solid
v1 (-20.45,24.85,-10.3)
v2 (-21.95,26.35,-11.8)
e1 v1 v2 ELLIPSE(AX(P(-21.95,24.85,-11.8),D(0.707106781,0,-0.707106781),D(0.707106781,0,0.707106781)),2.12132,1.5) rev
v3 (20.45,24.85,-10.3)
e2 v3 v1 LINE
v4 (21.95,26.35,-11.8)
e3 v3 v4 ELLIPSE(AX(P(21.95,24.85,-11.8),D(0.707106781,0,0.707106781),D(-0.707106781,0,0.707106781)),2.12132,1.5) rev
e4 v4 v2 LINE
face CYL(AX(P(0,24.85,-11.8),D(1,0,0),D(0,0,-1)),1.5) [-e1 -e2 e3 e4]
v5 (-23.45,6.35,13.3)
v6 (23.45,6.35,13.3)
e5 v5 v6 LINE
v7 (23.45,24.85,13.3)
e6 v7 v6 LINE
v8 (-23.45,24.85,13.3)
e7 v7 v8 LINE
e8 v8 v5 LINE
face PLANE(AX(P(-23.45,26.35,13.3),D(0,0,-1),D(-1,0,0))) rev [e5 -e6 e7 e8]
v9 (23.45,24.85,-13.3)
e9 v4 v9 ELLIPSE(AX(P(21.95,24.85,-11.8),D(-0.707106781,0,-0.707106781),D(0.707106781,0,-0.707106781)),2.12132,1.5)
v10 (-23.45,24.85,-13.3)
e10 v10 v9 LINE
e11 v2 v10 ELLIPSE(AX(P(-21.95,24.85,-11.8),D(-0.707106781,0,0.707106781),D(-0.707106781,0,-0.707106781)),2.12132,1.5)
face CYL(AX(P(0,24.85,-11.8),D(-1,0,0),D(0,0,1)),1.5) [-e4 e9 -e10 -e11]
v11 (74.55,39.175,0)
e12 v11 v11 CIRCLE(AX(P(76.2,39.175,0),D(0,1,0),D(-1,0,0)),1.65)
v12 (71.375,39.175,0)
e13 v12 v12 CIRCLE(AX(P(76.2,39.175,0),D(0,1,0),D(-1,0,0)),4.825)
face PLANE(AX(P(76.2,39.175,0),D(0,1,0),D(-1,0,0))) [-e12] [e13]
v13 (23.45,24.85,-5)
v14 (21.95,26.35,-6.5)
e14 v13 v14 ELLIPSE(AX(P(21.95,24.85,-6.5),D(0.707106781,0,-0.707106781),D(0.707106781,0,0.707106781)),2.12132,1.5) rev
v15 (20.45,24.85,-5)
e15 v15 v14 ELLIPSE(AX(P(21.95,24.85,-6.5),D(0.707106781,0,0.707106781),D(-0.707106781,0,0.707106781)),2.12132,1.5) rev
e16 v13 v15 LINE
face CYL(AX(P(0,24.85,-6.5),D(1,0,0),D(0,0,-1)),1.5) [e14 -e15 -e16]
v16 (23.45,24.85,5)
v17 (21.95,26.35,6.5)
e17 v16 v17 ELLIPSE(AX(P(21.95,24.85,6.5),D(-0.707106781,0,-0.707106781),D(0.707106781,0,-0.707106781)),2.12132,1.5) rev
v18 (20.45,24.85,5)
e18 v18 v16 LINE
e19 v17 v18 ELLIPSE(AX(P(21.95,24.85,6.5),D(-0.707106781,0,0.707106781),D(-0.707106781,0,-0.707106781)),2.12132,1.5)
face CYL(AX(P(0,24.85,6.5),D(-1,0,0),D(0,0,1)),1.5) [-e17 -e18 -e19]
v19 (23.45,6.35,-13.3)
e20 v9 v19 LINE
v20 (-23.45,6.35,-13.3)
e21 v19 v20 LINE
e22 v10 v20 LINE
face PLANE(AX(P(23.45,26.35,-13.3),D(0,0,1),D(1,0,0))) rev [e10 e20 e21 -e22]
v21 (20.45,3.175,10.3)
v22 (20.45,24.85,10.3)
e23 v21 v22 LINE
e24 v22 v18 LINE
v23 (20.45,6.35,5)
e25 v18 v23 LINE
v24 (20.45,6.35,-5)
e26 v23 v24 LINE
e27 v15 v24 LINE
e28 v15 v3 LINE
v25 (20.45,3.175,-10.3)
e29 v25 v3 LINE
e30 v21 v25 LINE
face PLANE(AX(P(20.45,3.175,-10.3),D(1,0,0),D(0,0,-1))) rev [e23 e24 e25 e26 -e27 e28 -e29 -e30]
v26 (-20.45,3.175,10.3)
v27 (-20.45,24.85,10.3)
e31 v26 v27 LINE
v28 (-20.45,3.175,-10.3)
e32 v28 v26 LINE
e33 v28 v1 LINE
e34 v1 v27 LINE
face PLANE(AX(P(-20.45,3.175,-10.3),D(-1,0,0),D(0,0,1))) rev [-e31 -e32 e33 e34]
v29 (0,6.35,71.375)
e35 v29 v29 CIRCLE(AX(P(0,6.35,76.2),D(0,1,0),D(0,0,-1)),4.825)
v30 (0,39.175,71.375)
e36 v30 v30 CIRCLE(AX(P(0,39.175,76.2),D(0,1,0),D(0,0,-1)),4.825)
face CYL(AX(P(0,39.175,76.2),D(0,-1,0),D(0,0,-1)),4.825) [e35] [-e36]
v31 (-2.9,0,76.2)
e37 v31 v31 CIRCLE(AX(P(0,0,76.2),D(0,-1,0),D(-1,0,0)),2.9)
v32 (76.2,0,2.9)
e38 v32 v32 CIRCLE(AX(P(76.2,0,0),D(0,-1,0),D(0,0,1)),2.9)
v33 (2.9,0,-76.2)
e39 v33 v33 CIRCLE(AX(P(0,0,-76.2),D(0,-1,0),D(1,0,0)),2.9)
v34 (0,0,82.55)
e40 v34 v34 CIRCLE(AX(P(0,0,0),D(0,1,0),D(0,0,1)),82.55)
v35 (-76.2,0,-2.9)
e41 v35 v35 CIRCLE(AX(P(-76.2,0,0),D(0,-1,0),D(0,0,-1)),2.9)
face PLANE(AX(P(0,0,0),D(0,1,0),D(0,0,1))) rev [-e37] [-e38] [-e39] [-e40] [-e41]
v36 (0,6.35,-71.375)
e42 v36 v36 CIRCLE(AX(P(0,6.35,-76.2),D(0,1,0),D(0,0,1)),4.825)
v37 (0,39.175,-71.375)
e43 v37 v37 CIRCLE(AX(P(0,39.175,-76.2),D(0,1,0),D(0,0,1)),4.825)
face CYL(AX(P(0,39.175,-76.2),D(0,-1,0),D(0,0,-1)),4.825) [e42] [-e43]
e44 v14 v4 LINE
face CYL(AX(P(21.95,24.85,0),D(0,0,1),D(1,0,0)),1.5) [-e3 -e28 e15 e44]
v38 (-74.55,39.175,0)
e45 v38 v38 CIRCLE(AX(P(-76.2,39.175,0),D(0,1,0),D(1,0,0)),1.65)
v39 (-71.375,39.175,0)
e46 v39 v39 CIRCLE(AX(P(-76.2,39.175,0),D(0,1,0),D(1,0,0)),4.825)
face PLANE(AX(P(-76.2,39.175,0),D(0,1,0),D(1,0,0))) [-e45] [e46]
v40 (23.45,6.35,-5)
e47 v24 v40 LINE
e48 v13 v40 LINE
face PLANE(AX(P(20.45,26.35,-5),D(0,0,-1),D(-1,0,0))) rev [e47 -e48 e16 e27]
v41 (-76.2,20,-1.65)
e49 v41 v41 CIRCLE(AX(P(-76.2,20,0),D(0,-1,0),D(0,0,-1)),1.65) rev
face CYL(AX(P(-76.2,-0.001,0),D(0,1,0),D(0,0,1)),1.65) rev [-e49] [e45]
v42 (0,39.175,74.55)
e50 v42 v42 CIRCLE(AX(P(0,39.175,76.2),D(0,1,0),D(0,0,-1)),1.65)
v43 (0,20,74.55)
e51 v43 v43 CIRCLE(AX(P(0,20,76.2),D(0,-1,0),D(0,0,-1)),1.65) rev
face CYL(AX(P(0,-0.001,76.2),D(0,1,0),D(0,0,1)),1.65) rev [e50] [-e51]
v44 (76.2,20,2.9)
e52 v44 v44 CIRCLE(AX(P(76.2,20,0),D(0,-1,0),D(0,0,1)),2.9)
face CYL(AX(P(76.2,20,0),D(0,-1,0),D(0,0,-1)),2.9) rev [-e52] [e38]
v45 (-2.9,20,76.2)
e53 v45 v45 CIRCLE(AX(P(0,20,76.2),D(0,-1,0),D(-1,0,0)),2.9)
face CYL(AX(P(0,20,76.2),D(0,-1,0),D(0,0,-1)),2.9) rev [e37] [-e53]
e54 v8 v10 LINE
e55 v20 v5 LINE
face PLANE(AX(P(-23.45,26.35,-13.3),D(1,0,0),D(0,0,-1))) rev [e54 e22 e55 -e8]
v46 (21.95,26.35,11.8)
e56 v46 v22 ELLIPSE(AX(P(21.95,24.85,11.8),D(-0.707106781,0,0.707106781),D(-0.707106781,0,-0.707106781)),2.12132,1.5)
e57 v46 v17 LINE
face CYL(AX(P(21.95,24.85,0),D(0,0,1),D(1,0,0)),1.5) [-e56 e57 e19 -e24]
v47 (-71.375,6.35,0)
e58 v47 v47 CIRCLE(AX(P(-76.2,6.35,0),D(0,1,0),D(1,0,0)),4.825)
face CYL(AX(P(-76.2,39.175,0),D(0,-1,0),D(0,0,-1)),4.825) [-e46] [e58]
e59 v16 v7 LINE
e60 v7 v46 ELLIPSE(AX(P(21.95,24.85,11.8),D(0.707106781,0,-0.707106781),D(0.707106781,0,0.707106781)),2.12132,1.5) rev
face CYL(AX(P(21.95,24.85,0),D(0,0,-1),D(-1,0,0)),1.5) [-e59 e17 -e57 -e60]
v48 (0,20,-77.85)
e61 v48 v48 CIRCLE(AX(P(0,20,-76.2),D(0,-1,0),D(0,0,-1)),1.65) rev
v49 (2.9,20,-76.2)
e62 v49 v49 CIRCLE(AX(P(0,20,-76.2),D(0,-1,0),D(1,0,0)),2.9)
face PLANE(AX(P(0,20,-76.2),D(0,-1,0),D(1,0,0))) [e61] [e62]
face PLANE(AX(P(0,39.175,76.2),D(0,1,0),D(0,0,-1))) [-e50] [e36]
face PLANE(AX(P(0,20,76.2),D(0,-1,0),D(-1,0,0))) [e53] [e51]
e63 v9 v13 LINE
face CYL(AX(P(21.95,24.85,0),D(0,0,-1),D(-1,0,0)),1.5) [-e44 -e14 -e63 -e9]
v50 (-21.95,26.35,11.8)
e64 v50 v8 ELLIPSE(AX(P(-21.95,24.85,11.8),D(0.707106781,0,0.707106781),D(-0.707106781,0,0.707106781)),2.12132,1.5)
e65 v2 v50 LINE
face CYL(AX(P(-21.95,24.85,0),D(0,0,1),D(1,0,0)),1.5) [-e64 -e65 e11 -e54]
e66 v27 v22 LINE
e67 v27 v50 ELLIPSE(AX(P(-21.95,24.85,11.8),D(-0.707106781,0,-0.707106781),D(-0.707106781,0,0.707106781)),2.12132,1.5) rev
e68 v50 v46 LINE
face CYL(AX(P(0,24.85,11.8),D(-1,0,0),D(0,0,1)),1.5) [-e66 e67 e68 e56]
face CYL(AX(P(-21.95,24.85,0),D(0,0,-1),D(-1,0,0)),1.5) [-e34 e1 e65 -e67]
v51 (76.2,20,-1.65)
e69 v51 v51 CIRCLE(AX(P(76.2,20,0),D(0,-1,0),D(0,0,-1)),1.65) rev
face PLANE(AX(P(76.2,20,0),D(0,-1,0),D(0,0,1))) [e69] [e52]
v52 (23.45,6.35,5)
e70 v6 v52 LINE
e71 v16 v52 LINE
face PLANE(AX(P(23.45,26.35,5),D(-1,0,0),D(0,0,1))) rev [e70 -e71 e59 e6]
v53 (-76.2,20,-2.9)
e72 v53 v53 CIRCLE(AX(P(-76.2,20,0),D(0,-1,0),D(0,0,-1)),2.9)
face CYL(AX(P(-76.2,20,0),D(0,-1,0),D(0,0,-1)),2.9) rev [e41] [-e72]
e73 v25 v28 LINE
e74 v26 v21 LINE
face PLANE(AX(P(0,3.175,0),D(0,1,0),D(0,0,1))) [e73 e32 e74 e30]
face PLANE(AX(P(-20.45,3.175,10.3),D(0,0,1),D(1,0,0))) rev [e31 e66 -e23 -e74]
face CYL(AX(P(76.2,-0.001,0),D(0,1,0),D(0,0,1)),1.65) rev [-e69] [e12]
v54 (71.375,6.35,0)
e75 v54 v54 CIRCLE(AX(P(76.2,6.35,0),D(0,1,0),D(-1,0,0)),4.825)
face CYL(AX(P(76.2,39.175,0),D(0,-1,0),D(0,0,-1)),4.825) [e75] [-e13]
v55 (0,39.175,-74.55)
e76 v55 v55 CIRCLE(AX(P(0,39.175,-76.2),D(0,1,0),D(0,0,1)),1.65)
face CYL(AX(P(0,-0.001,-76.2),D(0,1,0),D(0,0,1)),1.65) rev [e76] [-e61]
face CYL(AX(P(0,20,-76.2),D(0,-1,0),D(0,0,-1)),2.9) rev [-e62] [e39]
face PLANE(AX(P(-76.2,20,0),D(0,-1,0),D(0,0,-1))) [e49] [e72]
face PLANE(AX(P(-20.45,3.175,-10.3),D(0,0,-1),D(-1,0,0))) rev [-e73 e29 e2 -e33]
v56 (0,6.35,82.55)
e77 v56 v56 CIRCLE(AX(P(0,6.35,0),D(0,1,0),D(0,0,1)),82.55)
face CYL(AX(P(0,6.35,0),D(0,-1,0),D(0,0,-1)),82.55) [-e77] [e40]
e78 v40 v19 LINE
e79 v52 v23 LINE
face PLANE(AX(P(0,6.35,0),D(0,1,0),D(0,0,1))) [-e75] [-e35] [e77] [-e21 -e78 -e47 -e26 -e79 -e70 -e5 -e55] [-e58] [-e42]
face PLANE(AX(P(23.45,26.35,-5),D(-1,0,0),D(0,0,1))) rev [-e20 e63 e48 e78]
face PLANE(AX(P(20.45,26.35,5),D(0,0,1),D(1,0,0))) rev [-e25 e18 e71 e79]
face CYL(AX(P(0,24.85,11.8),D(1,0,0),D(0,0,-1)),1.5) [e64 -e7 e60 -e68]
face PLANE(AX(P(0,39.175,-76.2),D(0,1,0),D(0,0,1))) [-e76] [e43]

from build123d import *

# Parameters (mm, degrees)
SKETCH1_R           = 82.55
BOSS_EXTRUDE2_DEPTH = 6.35
SKETCH2_W           = 40.9
SKETCH2_H           = 20.6
CUT_EXTRUDE1_DEPTH  = 3.175
CUT_EXTRUDE2_REACH  = 118.916
SKETCH3_R           = 1.65
CIRPATTERN1_COUNT   = 4
BOSS_EXTRUDE3_START = 32.824999914
SKETCH5_R           = 4.825
SKETCH5_R_2         = 1.65
BOSS_EXTRUDE3_DEPTH = 32.824999914
CIRPATTERN3_COUNT   = 4
SKETCH4_R           = 2.9
CUT_EXTRUDE3_DEPTH  = 20
CIRPATTERN4_COUNT   = 4
BOSS_EXTRUDE5_DEPTH = 20
FILLET1_R           = 1.5


with BuildPart() as part:
    # Sketch1 → Boss-Extrude2 (new body)
    with BuildSketch(Plane(origin=(0, 0, 0), x_dir=(1, 0, 0), z_dir=(0, 1, 0))):
        with Locations(Location((0, 0, 0), (0, 0, 270))):
            Circle(SKETCH1_R)
    extrude(amount=BOSS_EXTRUDE2_DEPTH)

    # Sketch2 → Cut-Extrude1 (cut)
    with BuildSketch(Plane(origin=(0, 6.35, 0), x_dir=(1, 0, 0), z_dir=(0, 1, 0))):
        Rectangle(SKETCH2_W, SKETCH2_H)
    extrude(amount=-CUT_EXTRUDE1_DEPTH, mode=Mode.SUBTRACT)

    # Sketch3 → Cut-Extrude2 (cut, up to next)
    with BuildSketch(Plane(origin=(0, 6.35, 0), x_dir=(1, 0, 0), z_dir=(0, 1, 0)), mode=Mode.PRIVATE) as cut_extrude2_sk1:
        with Locations(Location((0, 76.2, 0), (0, 0, 270))):
            Circle(SKETCH3_R)
    cut_extrude2_tool1 = extrude(cut_extrude2_sk1.sketch, amount=-CUT_EXTRUDE2_REACH, mode=Mode.PRIVATE) & part.part
    cut_extrude2 = cut_extrude2_tool1.solids().sort_by_distance((0, 6.35, -76.2))[0]
    add(cut_extrude2, mode=Mode.SUBTRACT)

    # CirPattern1: Cut-Extrude2 ×4 about axis
    cirpattern1_axis = Axis((0, 0, 0), (0, 1, 0))
    for i in range(1, CIRPATTERN1_COUNT):
        add(cut_extrude2.rotate(cirpattern1_axis, i * 360 / CIRPATTERN1_COUNT), mode=Mode.SUBTRACT)

    # Sketch5 → Boss-Extrude3 (add)
    with BuildSketch(Plane(origin=(0, 6.35, 0), x_dir=(1, 0, 0), z_dir=(0, 1, 0)).offset(BOSS_EXTRUDE3_START)):
        with Locations(Location((0, 76.2, 0), (0, 0, 270))):
            Circle(SKETCH5_R)
        with Locations(Location((0, 76.2, 0), (0, 0, 270))):
            Circle(SKETCH5_R_2, mode=Mode.SUBTRACT)
    boss_extrude3 = extrude(amount=-BOSS_EXTRUDE3_DEPTH)

    # CirPattern3: Boss-Extrude3 ×4 about axis
    cirpattern3_axis = Axis((0, 0, 0), (0, 1, 0))
    for i in range(1, CIRPATTERN3_COUNT):
        add(boss_extrude3.rotate(cirpattern3_axis, i * 360 / CIRPATTERN3_COUNT))

    # Sketch4 → Cut-Extrude3 (cut)
    with BuildSketch(Plane.XZ):
        with Locations(Location((-76.2, 0, 0), (0, 0, 270))):
            Circle(SKETCH4_R)
    cut_extrude3 = extrude(amount=-CUT_EXTRUDE3_DEPTH, mode=Mode.SUBTRACT)

    # CirPattern4: Cut-Extrude3 ×4 about axis
    cirpattern4_axis = Axis((0, 0, 0), (0, 1, 0))
    for i in range(1, CIRPATTERN4_COUNT):
        add(cut_extrude3.rotate(cirpattern4_axis, i * 360 / CIRPATTERN4_COUNT), mode=Mode.SUBTRACT)

    # Sketch6 → Boss-Extrude5 (add)
    with BuildSketch(Plane(origin=(0, 6.35, 0), x_dir=(1, 0, 0), z_dir=(0, 1, 0))):
        Polygon((-20.45, 10.3), (20.45, 10.3), (20.45, 5), (23.45, 5), (23.45, 13.3), (-23.45, 13.3), (-23.45, -13.3), (23.45, -13.3), (23.45, -5), (20.45, -5), (20.45, -10.3), (-20.45, -10.3), align=None)
    extrude(amount=BOSS_EXTRUDE5_DEPTH)

    # Fillet1
    fillet1_edges = [part.edges().sort_by_distance(p)[0] for p in [
        (23.45, 26.35, -9.15),
        (0, 26.35, -13.3),
        (-23.45, 26.35, 0),
        (0, 26.35, 13.3),
        (23.45, 26.35, 9.15),
        (21.95, 26.35, 5),
        (20.45, 26.35, 7.65),
        (0, 26.35, 10.3),
        (-20.45, 26.35, 0),
        (0, 26.35, -10.3),
        (20.45, 26.35, -7.65),
        (21.95, 26.35, -5),
    ]]
    fillet(fillet1_edges, radius=FILLET1_R - 0.0001)  # a hair under: the kernel refuses the full size


solid = part.part
